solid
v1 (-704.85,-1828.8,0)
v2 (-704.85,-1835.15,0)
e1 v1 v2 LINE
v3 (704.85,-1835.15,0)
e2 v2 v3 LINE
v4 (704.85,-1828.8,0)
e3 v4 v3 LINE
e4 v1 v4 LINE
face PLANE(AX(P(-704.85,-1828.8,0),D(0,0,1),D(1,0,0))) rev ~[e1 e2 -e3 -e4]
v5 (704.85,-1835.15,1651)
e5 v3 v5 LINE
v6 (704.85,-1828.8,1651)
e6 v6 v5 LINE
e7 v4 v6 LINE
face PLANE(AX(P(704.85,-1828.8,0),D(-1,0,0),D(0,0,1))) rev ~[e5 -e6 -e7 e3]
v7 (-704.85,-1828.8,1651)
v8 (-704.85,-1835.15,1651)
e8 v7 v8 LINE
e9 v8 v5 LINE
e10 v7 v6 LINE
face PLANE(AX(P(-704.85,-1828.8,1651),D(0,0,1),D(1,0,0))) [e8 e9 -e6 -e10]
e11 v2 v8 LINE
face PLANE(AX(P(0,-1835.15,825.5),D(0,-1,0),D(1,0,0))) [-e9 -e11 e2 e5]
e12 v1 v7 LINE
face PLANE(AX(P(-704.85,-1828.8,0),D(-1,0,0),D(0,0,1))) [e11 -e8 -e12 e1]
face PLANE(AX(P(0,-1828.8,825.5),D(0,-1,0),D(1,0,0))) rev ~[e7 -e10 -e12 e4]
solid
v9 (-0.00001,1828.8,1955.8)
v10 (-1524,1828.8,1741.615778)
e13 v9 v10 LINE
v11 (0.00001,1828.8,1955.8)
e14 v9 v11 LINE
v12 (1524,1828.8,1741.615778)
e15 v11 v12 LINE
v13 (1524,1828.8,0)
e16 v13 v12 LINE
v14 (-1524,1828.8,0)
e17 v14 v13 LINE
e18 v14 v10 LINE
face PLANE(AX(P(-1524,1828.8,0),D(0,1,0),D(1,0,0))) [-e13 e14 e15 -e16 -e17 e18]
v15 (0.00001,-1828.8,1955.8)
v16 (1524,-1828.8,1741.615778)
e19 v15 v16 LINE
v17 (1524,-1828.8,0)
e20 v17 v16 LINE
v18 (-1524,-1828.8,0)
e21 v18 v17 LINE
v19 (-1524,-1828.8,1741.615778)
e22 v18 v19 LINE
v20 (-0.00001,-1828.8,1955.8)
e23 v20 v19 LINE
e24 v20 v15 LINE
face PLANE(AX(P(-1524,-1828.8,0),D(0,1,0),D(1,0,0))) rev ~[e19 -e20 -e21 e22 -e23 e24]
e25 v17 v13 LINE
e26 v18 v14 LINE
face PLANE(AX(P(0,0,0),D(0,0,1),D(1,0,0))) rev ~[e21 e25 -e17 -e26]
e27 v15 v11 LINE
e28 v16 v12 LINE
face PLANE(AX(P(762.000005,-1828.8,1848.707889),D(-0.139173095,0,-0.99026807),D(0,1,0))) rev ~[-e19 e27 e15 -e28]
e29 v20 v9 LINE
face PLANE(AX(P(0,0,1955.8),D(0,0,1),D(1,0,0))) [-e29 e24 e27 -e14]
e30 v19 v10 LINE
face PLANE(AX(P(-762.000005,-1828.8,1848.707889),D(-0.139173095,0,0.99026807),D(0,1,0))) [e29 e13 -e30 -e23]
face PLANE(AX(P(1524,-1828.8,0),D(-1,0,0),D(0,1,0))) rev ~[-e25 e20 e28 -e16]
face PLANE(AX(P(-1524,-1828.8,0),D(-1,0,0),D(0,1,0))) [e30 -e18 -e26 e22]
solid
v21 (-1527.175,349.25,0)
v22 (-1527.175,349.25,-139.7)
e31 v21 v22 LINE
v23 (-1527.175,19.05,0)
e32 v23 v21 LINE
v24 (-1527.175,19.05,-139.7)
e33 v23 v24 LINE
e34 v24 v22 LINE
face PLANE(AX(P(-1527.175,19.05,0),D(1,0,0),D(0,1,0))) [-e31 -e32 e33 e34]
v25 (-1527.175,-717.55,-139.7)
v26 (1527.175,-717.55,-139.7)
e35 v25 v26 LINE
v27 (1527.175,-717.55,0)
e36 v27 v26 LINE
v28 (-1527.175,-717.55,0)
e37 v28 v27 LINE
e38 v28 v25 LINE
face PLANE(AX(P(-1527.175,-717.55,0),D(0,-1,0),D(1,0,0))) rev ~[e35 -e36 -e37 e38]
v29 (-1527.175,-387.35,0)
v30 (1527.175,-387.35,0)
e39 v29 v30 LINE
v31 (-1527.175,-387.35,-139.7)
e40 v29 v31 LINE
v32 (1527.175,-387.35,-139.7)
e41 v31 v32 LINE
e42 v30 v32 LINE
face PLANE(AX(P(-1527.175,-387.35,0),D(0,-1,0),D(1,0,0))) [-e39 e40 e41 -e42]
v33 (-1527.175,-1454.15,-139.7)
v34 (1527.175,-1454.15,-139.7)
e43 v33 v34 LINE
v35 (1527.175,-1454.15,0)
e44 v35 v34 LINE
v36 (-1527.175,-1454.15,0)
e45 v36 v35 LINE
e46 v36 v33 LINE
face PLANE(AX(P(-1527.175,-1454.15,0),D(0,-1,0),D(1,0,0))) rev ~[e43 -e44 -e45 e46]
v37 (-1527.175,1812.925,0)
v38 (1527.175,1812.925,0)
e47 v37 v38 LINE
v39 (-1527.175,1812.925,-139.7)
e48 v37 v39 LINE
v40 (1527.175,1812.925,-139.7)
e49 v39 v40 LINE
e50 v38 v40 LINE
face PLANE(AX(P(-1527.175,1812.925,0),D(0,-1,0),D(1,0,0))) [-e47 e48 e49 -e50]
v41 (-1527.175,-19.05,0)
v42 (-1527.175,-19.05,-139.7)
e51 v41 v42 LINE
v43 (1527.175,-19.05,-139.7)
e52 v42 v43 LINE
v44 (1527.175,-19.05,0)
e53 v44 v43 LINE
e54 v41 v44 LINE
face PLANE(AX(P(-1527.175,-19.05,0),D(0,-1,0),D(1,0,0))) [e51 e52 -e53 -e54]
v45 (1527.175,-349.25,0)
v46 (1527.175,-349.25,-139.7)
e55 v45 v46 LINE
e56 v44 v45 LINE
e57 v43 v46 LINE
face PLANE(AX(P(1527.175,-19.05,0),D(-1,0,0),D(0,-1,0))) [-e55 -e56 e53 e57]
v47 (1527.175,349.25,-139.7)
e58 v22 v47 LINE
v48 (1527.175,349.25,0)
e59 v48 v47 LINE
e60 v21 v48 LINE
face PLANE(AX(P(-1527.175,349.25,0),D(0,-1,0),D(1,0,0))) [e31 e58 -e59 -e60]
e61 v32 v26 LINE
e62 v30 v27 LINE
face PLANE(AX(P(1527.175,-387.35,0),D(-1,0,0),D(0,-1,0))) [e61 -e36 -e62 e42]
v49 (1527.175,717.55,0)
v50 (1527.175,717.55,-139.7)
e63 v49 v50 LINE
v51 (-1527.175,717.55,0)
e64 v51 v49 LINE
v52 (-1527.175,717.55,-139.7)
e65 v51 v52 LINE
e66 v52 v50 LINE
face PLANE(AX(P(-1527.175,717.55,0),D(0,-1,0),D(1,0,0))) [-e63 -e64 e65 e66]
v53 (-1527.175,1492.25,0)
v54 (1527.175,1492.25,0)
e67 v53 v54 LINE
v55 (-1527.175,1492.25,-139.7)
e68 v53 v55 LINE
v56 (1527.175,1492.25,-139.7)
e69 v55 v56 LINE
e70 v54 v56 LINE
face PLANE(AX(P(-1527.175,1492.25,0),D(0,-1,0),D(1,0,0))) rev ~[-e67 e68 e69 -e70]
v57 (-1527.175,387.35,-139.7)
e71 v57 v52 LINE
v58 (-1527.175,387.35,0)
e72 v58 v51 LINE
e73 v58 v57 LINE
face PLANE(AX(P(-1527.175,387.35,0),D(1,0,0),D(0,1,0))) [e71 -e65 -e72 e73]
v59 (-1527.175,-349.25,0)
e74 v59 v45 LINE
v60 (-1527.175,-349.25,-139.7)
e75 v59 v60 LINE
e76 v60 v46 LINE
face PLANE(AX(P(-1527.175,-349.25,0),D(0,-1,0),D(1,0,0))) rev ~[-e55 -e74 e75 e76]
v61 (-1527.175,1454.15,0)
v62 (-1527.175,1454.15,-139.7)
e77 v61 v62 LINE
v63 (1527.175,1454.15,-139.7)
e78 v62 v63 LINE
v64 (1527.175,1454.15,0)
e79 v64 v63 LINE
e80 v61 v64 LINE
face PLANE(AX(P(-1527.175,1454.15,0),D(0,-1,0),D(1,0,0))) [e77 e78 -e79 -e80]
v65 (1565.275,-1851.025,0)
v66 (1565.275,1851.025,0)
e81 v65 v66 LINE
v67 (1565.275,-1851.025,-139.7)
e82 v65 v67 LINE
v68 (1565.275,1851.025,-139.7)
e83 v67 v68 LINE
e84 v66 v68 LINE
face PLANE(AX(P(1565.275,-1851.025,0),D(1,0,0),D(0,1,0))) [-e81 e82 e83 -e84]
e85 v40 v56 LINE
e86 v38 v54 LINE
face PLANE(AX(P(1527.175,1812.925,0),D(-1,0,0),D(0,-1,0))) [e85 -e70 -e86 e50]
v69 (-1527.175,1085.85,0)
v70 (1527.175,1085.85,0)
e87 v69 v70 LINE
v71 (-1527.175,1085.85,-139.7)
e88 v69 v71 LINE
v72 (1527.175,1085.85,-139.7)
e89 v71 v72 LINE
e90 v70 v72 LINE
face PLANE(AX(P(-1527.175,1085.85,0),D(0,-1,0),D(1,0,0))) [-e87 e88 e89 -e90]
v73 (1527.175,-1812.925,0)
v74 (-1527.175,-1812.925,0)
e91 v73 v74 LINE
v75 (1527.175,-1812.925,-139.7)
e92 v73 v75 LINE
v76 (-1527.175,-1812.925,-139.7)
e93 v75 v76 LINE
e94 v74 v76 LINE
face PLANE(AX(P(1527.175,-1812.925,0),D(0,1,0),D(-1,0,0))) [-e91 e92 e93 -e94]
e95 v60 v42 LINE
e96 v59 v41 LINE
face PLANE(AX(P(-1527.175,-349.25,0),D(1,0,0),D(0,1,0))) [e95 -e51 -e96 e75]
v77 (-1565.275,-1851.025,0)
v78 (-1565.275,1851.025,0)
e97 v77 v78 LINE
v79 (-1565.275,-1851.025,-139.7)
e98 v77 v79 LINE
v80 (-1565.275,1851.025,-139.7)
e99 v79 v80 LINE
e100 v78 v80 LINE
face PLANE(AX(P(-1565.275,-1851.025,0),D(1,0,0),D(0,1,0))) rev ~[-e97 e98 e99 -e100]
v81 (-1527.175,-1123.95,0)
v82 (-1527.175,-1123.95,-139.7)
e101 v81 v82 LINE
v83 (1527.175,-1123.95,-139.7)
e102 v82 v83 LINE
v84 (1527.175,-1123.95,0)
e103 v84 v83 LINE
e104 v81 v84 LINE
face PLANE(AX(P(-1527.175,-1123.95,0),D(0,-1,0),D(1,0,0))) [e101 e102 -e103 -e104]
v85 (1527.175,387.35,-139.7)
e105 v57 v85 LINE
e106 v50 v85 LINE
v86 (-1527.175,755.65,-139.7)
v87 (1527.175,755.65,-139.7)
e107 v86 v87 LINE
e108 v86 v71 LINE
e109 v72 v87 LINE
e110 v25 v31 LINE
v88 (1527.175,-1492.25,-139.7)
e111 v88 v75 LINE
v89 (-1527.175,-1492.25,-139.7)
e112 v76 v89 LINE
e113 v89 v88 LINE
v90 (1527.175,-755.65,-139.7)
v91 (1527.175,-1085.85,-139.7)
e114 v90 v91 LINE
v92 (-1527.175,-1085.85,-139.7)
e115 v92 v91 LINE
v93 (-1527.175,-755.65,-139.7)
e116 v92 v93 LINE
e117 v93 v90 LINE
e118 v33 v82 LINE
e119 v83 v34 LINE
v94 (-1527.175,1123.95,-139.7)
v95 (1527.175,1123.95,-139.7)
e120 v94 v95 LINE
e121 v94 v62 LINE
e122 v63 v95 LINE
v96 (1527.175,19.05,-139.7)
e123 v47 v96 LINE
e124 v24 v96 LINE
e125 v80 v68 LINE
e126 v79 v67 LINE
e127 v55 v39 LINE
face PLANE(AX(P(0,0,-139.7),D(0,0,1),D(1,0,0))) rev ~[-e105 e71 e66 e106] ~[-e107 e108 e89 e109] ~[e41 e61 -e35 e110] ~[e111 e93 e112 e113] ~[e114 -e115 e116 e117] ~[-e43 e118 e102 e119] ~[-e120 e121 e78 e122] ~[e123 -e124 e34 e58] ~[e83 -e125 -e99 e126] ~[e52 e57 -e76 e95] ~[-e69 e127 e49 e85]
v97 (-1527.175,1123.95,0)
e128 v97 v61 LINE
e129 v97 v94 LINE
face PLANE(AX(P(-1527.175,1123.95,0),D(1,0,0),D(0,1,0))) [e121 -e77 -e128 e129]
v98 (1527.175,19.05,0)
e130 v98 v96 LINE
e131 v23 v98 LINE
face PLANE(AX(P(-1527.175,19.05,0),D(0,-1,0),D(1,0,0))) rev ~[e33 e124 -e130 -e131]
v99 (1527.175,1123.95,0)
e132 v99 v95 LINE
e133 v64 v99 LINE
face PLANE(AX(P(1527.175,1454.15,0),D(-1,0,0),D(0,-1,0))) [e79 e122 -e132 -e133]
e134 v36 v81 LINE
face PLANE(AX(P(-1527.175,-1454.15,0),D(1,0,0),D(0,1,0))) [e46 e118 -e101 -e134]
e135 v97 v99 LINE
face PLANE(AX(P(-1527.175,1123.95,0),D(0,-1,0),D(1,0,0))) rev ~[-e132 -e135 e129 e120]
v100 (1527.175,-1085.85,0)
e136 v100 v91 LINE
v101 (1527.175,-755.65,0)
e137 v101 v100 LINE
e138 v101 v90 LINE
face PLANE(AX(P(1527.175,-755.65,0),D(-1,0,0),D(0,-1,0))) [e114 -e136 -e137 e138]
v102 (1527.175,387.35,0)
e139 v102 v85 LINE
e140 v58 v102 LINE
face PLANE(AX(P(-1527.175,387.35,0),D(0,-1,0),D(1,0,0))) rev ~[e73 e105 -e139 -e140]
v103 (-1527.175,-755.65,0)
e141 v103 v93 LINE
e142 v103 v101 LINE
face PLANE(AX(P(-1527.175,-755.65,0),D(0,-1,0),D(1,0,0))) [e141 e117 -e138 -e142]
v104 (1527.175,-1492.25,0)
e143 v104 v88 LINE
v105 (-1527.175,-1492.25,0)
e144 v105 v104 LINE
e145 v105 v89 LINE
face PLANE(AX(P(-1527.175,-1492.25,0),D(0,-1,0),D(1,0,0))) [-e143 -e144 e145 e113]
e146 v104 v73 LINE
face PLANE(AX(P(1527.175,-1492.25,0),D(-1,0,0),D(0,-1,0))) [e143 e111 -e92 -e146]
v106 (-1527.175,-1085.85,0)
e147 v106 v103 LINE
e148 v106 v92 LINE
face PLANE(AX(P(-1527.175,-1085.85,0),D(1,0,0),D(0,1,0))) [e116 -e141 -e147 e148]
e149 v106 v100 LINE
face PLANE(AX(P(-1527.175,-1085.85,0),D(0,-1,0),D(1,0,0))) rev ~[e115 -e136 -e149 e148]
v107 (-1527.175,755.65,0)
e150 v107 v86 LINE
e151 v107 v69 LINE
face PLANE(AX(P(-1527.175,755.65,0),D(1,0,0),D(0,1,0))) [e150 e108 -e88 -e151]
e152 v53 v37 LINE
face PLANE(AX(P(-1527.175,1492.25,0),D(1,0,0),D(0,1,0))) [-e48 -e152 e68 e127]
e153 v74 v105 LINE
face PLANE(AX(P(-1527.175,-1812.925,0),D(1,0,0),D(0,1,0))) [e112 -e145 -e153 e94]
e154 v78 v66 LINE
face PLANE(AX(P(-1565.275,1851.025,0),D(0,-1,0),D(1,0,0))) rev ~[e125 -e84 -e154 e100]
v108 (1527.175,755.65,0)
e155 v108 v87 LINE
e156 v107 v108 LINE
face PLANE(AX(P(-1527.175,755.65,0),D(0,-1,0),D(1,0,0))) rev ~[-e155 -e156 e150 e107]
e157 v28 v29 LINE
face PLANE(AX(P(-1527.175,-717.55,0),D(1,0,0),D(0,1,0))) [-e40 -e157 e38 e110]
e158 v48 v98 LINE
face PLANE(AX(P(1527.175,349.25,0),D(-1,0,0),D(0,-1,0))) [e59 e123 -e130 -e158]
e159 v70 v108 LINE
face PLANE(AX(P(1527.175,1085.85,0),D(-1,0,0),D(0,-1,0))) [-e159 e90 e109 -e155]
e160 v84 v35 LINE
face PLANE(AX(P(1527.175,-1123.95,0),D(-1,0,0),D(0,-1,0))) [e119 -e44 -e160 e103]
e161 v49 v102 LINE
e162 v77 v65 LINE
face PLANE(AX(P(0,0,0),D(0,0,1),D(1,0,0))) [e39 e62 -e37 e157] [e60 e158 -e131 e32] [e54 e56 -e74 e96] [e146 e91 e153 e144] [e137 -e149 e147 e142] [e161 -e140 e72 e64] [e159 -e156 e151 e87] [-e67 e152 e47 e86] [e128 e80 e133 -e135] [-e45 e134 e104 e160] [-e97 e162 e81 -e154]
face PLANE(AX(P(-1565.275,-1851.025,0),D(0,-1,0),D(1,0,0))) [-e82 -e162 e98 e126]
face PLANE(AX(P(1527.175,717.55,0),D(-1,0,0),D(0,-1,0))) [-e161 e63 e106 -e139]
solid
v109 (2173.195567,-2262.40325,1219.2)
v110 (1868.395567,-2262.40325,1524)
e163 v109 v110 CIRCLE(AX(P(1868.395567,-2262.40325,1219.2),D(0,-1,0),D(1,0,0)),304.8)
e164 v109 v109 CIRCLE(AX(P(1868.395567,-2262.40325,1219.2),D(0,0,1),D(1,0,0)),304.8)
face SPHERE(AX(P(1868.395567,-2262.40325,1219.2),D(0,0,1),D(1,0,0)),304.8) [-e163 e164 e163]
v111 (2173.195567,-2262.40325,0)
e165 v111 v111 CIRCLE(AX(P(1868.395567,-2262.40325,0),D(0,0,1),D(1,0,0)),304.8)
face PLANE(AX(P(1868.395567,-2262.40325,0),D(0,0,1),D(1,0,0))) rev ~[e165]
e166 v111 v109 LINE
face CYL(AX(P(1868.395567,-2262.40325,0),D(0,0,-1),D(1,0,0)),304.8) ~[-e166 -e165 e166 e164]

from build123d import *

# Parameters (mm, degrees)
F0_W     = 3130.55
F0_H     = 3702.05
F0_W_2   = 3054.35
F0_H_2   = 38.1
F1_DEPTH = 139.7
F2_W     = 3048
F2_H     = 3657.6
F3_DEPTH = 1955.8
F4_SIZE2 = 214.184222
F4_SIZE  = 1523.99999
F5_W     = 1409.7
F5_H     = 1651
F6_DEPTH = 6.35
F7_R     = 304.8
F8_DEPTH = 1524
F9_R     = 304.8


# Not quite as in the source:
# - a fillet or chamfer is up to 0.001 mm smaller than in the source, because OpenCascade refuses the exact size


with BuildPart() as f1:
    # F0 (on Top) → F1 (new body)
    with BuildSketch(Plane.XY):
        Rectangle(F0_W, F0_H)
        Polygon((1527.175, -1492.25), (1527.175, -1812.925), (-1527.175, -1812.925), (-1527.175, -1492.25), (-1527.175, -1454.15), (-1527.175, -1123.95), (-1527.175, -1085.85), (-1527.175, -755.65), (-1527.175, -717.55), (-1527.175, -387.35), (-1527.175, -349.25), (-1527.175, -19.05), (-1527.175, 19.05), (-1527.175, 349.25), (-1527.175, 387.35), (-1527.175, 717.55), (-1527.175, 755.65), (-1527.175, 1085.85), (-1527.175, 1123.95), (-1527.175, 1454.15), (-1527.175, 1492.25), (-1527.175, 1812.925), (1527.175, 1812.925), (1527.175, 1492.25), (1527.175, 1454.15), (1527.175, 1123.95), (1527.175, 1085.85), (1527.175, 755.65), (1527.175, 717.55), (1527.175, 387.35), (1527.175, 349.25), (1527.175, 19.05), (1527.175, -19.05), (1527.175, -349.25), (1527.175, -387.35), (1527.175, -717.55), (1527.175, -755.65), (1527.175, -1085.85), (1527.175, -1123.95), (1527.175, -1454.15), align=None, mode=Mode.SUBTRACT)
        with Locations((0, -368.3)):
            Rectangle(F0_W_2, F0_H_2)
        with Locations((0, -736.6)):
            Rectangle(F0_W_2, F0_H_2)
        with Locations((0, -1104.9)):
            Rectangle(F0_W_2, F0_H_2)
        with Locations((0, -1473.2)):
            Rectangle(F0_W_2, F0_H_2)
        Rectangle(F0_W_2, F0_H_2)
        with Locations((0, 368.3)):
            Rectangle(F0_W_2, F0_H_2)
        with Locations((0, 736.6)):
            Rectangle(F0_W_2, F0_H_2)
        with Locations((0, 1104.9)):
            Rectangle(F0_W_2, F0_H_2)
        with Locations((0, 1473.2)):
            Rectangle(F0_W_2, F0_H_2)
    extrude(amount=-F1_DEPTH)


with BuildPart() as f3:
    # F2 (on Top) → F3 (new body)
    with BuildSketch(Plane.XY):
        Rectangle(F2_W, F2_H)
    extrude(amount=F3_DEPTH)

    # F4 (size 1524 and 214.1842320864 in the source; OpenCascade refuses exactly that, so slightly less here)
    f4_edges = [f3.edges().sort_by_distance(p)[0] for p in [
        (1524, 0, 1955.8),
        (-1524, 0, 1955.8),
    ]]
    f4_side = f3.faces().sort_by_distance((0, 0, 1955.8))[0]
    chamfer(f4_edges, length=F4_SIZE, length2=F4_SIZE2, reference=f4_side)


with BuildPart() as f6:
    # F5 (on face) → F6 (new body)
    with BuildSketch(Plane.XZ.offset(1828.8)):
        with Locations((0, 825.5)):
            Rectangle(F5_W, F5_H)
    extrude(amount=F6_DEPTH)


with BuildPart() as f8:
    # F7 (on Top) → F8 (new body)
    with BuildSketch(Plane.XY):
        with Locations((1868.3955669403, -2262.4032497406)):
            Circle(F7_R)
    extrude(amount=F8_DEPTH)

    # F9
    f9_edges = [f8.edges().sort_by_distance(p)[0] for p in [
        (1563.595567, -2262.40325, 1524),
    ]]
    fillet(f9_edges, radius=F9_R)


solid = Compound([f1.part, f3.part, f6.part, f8.part])
